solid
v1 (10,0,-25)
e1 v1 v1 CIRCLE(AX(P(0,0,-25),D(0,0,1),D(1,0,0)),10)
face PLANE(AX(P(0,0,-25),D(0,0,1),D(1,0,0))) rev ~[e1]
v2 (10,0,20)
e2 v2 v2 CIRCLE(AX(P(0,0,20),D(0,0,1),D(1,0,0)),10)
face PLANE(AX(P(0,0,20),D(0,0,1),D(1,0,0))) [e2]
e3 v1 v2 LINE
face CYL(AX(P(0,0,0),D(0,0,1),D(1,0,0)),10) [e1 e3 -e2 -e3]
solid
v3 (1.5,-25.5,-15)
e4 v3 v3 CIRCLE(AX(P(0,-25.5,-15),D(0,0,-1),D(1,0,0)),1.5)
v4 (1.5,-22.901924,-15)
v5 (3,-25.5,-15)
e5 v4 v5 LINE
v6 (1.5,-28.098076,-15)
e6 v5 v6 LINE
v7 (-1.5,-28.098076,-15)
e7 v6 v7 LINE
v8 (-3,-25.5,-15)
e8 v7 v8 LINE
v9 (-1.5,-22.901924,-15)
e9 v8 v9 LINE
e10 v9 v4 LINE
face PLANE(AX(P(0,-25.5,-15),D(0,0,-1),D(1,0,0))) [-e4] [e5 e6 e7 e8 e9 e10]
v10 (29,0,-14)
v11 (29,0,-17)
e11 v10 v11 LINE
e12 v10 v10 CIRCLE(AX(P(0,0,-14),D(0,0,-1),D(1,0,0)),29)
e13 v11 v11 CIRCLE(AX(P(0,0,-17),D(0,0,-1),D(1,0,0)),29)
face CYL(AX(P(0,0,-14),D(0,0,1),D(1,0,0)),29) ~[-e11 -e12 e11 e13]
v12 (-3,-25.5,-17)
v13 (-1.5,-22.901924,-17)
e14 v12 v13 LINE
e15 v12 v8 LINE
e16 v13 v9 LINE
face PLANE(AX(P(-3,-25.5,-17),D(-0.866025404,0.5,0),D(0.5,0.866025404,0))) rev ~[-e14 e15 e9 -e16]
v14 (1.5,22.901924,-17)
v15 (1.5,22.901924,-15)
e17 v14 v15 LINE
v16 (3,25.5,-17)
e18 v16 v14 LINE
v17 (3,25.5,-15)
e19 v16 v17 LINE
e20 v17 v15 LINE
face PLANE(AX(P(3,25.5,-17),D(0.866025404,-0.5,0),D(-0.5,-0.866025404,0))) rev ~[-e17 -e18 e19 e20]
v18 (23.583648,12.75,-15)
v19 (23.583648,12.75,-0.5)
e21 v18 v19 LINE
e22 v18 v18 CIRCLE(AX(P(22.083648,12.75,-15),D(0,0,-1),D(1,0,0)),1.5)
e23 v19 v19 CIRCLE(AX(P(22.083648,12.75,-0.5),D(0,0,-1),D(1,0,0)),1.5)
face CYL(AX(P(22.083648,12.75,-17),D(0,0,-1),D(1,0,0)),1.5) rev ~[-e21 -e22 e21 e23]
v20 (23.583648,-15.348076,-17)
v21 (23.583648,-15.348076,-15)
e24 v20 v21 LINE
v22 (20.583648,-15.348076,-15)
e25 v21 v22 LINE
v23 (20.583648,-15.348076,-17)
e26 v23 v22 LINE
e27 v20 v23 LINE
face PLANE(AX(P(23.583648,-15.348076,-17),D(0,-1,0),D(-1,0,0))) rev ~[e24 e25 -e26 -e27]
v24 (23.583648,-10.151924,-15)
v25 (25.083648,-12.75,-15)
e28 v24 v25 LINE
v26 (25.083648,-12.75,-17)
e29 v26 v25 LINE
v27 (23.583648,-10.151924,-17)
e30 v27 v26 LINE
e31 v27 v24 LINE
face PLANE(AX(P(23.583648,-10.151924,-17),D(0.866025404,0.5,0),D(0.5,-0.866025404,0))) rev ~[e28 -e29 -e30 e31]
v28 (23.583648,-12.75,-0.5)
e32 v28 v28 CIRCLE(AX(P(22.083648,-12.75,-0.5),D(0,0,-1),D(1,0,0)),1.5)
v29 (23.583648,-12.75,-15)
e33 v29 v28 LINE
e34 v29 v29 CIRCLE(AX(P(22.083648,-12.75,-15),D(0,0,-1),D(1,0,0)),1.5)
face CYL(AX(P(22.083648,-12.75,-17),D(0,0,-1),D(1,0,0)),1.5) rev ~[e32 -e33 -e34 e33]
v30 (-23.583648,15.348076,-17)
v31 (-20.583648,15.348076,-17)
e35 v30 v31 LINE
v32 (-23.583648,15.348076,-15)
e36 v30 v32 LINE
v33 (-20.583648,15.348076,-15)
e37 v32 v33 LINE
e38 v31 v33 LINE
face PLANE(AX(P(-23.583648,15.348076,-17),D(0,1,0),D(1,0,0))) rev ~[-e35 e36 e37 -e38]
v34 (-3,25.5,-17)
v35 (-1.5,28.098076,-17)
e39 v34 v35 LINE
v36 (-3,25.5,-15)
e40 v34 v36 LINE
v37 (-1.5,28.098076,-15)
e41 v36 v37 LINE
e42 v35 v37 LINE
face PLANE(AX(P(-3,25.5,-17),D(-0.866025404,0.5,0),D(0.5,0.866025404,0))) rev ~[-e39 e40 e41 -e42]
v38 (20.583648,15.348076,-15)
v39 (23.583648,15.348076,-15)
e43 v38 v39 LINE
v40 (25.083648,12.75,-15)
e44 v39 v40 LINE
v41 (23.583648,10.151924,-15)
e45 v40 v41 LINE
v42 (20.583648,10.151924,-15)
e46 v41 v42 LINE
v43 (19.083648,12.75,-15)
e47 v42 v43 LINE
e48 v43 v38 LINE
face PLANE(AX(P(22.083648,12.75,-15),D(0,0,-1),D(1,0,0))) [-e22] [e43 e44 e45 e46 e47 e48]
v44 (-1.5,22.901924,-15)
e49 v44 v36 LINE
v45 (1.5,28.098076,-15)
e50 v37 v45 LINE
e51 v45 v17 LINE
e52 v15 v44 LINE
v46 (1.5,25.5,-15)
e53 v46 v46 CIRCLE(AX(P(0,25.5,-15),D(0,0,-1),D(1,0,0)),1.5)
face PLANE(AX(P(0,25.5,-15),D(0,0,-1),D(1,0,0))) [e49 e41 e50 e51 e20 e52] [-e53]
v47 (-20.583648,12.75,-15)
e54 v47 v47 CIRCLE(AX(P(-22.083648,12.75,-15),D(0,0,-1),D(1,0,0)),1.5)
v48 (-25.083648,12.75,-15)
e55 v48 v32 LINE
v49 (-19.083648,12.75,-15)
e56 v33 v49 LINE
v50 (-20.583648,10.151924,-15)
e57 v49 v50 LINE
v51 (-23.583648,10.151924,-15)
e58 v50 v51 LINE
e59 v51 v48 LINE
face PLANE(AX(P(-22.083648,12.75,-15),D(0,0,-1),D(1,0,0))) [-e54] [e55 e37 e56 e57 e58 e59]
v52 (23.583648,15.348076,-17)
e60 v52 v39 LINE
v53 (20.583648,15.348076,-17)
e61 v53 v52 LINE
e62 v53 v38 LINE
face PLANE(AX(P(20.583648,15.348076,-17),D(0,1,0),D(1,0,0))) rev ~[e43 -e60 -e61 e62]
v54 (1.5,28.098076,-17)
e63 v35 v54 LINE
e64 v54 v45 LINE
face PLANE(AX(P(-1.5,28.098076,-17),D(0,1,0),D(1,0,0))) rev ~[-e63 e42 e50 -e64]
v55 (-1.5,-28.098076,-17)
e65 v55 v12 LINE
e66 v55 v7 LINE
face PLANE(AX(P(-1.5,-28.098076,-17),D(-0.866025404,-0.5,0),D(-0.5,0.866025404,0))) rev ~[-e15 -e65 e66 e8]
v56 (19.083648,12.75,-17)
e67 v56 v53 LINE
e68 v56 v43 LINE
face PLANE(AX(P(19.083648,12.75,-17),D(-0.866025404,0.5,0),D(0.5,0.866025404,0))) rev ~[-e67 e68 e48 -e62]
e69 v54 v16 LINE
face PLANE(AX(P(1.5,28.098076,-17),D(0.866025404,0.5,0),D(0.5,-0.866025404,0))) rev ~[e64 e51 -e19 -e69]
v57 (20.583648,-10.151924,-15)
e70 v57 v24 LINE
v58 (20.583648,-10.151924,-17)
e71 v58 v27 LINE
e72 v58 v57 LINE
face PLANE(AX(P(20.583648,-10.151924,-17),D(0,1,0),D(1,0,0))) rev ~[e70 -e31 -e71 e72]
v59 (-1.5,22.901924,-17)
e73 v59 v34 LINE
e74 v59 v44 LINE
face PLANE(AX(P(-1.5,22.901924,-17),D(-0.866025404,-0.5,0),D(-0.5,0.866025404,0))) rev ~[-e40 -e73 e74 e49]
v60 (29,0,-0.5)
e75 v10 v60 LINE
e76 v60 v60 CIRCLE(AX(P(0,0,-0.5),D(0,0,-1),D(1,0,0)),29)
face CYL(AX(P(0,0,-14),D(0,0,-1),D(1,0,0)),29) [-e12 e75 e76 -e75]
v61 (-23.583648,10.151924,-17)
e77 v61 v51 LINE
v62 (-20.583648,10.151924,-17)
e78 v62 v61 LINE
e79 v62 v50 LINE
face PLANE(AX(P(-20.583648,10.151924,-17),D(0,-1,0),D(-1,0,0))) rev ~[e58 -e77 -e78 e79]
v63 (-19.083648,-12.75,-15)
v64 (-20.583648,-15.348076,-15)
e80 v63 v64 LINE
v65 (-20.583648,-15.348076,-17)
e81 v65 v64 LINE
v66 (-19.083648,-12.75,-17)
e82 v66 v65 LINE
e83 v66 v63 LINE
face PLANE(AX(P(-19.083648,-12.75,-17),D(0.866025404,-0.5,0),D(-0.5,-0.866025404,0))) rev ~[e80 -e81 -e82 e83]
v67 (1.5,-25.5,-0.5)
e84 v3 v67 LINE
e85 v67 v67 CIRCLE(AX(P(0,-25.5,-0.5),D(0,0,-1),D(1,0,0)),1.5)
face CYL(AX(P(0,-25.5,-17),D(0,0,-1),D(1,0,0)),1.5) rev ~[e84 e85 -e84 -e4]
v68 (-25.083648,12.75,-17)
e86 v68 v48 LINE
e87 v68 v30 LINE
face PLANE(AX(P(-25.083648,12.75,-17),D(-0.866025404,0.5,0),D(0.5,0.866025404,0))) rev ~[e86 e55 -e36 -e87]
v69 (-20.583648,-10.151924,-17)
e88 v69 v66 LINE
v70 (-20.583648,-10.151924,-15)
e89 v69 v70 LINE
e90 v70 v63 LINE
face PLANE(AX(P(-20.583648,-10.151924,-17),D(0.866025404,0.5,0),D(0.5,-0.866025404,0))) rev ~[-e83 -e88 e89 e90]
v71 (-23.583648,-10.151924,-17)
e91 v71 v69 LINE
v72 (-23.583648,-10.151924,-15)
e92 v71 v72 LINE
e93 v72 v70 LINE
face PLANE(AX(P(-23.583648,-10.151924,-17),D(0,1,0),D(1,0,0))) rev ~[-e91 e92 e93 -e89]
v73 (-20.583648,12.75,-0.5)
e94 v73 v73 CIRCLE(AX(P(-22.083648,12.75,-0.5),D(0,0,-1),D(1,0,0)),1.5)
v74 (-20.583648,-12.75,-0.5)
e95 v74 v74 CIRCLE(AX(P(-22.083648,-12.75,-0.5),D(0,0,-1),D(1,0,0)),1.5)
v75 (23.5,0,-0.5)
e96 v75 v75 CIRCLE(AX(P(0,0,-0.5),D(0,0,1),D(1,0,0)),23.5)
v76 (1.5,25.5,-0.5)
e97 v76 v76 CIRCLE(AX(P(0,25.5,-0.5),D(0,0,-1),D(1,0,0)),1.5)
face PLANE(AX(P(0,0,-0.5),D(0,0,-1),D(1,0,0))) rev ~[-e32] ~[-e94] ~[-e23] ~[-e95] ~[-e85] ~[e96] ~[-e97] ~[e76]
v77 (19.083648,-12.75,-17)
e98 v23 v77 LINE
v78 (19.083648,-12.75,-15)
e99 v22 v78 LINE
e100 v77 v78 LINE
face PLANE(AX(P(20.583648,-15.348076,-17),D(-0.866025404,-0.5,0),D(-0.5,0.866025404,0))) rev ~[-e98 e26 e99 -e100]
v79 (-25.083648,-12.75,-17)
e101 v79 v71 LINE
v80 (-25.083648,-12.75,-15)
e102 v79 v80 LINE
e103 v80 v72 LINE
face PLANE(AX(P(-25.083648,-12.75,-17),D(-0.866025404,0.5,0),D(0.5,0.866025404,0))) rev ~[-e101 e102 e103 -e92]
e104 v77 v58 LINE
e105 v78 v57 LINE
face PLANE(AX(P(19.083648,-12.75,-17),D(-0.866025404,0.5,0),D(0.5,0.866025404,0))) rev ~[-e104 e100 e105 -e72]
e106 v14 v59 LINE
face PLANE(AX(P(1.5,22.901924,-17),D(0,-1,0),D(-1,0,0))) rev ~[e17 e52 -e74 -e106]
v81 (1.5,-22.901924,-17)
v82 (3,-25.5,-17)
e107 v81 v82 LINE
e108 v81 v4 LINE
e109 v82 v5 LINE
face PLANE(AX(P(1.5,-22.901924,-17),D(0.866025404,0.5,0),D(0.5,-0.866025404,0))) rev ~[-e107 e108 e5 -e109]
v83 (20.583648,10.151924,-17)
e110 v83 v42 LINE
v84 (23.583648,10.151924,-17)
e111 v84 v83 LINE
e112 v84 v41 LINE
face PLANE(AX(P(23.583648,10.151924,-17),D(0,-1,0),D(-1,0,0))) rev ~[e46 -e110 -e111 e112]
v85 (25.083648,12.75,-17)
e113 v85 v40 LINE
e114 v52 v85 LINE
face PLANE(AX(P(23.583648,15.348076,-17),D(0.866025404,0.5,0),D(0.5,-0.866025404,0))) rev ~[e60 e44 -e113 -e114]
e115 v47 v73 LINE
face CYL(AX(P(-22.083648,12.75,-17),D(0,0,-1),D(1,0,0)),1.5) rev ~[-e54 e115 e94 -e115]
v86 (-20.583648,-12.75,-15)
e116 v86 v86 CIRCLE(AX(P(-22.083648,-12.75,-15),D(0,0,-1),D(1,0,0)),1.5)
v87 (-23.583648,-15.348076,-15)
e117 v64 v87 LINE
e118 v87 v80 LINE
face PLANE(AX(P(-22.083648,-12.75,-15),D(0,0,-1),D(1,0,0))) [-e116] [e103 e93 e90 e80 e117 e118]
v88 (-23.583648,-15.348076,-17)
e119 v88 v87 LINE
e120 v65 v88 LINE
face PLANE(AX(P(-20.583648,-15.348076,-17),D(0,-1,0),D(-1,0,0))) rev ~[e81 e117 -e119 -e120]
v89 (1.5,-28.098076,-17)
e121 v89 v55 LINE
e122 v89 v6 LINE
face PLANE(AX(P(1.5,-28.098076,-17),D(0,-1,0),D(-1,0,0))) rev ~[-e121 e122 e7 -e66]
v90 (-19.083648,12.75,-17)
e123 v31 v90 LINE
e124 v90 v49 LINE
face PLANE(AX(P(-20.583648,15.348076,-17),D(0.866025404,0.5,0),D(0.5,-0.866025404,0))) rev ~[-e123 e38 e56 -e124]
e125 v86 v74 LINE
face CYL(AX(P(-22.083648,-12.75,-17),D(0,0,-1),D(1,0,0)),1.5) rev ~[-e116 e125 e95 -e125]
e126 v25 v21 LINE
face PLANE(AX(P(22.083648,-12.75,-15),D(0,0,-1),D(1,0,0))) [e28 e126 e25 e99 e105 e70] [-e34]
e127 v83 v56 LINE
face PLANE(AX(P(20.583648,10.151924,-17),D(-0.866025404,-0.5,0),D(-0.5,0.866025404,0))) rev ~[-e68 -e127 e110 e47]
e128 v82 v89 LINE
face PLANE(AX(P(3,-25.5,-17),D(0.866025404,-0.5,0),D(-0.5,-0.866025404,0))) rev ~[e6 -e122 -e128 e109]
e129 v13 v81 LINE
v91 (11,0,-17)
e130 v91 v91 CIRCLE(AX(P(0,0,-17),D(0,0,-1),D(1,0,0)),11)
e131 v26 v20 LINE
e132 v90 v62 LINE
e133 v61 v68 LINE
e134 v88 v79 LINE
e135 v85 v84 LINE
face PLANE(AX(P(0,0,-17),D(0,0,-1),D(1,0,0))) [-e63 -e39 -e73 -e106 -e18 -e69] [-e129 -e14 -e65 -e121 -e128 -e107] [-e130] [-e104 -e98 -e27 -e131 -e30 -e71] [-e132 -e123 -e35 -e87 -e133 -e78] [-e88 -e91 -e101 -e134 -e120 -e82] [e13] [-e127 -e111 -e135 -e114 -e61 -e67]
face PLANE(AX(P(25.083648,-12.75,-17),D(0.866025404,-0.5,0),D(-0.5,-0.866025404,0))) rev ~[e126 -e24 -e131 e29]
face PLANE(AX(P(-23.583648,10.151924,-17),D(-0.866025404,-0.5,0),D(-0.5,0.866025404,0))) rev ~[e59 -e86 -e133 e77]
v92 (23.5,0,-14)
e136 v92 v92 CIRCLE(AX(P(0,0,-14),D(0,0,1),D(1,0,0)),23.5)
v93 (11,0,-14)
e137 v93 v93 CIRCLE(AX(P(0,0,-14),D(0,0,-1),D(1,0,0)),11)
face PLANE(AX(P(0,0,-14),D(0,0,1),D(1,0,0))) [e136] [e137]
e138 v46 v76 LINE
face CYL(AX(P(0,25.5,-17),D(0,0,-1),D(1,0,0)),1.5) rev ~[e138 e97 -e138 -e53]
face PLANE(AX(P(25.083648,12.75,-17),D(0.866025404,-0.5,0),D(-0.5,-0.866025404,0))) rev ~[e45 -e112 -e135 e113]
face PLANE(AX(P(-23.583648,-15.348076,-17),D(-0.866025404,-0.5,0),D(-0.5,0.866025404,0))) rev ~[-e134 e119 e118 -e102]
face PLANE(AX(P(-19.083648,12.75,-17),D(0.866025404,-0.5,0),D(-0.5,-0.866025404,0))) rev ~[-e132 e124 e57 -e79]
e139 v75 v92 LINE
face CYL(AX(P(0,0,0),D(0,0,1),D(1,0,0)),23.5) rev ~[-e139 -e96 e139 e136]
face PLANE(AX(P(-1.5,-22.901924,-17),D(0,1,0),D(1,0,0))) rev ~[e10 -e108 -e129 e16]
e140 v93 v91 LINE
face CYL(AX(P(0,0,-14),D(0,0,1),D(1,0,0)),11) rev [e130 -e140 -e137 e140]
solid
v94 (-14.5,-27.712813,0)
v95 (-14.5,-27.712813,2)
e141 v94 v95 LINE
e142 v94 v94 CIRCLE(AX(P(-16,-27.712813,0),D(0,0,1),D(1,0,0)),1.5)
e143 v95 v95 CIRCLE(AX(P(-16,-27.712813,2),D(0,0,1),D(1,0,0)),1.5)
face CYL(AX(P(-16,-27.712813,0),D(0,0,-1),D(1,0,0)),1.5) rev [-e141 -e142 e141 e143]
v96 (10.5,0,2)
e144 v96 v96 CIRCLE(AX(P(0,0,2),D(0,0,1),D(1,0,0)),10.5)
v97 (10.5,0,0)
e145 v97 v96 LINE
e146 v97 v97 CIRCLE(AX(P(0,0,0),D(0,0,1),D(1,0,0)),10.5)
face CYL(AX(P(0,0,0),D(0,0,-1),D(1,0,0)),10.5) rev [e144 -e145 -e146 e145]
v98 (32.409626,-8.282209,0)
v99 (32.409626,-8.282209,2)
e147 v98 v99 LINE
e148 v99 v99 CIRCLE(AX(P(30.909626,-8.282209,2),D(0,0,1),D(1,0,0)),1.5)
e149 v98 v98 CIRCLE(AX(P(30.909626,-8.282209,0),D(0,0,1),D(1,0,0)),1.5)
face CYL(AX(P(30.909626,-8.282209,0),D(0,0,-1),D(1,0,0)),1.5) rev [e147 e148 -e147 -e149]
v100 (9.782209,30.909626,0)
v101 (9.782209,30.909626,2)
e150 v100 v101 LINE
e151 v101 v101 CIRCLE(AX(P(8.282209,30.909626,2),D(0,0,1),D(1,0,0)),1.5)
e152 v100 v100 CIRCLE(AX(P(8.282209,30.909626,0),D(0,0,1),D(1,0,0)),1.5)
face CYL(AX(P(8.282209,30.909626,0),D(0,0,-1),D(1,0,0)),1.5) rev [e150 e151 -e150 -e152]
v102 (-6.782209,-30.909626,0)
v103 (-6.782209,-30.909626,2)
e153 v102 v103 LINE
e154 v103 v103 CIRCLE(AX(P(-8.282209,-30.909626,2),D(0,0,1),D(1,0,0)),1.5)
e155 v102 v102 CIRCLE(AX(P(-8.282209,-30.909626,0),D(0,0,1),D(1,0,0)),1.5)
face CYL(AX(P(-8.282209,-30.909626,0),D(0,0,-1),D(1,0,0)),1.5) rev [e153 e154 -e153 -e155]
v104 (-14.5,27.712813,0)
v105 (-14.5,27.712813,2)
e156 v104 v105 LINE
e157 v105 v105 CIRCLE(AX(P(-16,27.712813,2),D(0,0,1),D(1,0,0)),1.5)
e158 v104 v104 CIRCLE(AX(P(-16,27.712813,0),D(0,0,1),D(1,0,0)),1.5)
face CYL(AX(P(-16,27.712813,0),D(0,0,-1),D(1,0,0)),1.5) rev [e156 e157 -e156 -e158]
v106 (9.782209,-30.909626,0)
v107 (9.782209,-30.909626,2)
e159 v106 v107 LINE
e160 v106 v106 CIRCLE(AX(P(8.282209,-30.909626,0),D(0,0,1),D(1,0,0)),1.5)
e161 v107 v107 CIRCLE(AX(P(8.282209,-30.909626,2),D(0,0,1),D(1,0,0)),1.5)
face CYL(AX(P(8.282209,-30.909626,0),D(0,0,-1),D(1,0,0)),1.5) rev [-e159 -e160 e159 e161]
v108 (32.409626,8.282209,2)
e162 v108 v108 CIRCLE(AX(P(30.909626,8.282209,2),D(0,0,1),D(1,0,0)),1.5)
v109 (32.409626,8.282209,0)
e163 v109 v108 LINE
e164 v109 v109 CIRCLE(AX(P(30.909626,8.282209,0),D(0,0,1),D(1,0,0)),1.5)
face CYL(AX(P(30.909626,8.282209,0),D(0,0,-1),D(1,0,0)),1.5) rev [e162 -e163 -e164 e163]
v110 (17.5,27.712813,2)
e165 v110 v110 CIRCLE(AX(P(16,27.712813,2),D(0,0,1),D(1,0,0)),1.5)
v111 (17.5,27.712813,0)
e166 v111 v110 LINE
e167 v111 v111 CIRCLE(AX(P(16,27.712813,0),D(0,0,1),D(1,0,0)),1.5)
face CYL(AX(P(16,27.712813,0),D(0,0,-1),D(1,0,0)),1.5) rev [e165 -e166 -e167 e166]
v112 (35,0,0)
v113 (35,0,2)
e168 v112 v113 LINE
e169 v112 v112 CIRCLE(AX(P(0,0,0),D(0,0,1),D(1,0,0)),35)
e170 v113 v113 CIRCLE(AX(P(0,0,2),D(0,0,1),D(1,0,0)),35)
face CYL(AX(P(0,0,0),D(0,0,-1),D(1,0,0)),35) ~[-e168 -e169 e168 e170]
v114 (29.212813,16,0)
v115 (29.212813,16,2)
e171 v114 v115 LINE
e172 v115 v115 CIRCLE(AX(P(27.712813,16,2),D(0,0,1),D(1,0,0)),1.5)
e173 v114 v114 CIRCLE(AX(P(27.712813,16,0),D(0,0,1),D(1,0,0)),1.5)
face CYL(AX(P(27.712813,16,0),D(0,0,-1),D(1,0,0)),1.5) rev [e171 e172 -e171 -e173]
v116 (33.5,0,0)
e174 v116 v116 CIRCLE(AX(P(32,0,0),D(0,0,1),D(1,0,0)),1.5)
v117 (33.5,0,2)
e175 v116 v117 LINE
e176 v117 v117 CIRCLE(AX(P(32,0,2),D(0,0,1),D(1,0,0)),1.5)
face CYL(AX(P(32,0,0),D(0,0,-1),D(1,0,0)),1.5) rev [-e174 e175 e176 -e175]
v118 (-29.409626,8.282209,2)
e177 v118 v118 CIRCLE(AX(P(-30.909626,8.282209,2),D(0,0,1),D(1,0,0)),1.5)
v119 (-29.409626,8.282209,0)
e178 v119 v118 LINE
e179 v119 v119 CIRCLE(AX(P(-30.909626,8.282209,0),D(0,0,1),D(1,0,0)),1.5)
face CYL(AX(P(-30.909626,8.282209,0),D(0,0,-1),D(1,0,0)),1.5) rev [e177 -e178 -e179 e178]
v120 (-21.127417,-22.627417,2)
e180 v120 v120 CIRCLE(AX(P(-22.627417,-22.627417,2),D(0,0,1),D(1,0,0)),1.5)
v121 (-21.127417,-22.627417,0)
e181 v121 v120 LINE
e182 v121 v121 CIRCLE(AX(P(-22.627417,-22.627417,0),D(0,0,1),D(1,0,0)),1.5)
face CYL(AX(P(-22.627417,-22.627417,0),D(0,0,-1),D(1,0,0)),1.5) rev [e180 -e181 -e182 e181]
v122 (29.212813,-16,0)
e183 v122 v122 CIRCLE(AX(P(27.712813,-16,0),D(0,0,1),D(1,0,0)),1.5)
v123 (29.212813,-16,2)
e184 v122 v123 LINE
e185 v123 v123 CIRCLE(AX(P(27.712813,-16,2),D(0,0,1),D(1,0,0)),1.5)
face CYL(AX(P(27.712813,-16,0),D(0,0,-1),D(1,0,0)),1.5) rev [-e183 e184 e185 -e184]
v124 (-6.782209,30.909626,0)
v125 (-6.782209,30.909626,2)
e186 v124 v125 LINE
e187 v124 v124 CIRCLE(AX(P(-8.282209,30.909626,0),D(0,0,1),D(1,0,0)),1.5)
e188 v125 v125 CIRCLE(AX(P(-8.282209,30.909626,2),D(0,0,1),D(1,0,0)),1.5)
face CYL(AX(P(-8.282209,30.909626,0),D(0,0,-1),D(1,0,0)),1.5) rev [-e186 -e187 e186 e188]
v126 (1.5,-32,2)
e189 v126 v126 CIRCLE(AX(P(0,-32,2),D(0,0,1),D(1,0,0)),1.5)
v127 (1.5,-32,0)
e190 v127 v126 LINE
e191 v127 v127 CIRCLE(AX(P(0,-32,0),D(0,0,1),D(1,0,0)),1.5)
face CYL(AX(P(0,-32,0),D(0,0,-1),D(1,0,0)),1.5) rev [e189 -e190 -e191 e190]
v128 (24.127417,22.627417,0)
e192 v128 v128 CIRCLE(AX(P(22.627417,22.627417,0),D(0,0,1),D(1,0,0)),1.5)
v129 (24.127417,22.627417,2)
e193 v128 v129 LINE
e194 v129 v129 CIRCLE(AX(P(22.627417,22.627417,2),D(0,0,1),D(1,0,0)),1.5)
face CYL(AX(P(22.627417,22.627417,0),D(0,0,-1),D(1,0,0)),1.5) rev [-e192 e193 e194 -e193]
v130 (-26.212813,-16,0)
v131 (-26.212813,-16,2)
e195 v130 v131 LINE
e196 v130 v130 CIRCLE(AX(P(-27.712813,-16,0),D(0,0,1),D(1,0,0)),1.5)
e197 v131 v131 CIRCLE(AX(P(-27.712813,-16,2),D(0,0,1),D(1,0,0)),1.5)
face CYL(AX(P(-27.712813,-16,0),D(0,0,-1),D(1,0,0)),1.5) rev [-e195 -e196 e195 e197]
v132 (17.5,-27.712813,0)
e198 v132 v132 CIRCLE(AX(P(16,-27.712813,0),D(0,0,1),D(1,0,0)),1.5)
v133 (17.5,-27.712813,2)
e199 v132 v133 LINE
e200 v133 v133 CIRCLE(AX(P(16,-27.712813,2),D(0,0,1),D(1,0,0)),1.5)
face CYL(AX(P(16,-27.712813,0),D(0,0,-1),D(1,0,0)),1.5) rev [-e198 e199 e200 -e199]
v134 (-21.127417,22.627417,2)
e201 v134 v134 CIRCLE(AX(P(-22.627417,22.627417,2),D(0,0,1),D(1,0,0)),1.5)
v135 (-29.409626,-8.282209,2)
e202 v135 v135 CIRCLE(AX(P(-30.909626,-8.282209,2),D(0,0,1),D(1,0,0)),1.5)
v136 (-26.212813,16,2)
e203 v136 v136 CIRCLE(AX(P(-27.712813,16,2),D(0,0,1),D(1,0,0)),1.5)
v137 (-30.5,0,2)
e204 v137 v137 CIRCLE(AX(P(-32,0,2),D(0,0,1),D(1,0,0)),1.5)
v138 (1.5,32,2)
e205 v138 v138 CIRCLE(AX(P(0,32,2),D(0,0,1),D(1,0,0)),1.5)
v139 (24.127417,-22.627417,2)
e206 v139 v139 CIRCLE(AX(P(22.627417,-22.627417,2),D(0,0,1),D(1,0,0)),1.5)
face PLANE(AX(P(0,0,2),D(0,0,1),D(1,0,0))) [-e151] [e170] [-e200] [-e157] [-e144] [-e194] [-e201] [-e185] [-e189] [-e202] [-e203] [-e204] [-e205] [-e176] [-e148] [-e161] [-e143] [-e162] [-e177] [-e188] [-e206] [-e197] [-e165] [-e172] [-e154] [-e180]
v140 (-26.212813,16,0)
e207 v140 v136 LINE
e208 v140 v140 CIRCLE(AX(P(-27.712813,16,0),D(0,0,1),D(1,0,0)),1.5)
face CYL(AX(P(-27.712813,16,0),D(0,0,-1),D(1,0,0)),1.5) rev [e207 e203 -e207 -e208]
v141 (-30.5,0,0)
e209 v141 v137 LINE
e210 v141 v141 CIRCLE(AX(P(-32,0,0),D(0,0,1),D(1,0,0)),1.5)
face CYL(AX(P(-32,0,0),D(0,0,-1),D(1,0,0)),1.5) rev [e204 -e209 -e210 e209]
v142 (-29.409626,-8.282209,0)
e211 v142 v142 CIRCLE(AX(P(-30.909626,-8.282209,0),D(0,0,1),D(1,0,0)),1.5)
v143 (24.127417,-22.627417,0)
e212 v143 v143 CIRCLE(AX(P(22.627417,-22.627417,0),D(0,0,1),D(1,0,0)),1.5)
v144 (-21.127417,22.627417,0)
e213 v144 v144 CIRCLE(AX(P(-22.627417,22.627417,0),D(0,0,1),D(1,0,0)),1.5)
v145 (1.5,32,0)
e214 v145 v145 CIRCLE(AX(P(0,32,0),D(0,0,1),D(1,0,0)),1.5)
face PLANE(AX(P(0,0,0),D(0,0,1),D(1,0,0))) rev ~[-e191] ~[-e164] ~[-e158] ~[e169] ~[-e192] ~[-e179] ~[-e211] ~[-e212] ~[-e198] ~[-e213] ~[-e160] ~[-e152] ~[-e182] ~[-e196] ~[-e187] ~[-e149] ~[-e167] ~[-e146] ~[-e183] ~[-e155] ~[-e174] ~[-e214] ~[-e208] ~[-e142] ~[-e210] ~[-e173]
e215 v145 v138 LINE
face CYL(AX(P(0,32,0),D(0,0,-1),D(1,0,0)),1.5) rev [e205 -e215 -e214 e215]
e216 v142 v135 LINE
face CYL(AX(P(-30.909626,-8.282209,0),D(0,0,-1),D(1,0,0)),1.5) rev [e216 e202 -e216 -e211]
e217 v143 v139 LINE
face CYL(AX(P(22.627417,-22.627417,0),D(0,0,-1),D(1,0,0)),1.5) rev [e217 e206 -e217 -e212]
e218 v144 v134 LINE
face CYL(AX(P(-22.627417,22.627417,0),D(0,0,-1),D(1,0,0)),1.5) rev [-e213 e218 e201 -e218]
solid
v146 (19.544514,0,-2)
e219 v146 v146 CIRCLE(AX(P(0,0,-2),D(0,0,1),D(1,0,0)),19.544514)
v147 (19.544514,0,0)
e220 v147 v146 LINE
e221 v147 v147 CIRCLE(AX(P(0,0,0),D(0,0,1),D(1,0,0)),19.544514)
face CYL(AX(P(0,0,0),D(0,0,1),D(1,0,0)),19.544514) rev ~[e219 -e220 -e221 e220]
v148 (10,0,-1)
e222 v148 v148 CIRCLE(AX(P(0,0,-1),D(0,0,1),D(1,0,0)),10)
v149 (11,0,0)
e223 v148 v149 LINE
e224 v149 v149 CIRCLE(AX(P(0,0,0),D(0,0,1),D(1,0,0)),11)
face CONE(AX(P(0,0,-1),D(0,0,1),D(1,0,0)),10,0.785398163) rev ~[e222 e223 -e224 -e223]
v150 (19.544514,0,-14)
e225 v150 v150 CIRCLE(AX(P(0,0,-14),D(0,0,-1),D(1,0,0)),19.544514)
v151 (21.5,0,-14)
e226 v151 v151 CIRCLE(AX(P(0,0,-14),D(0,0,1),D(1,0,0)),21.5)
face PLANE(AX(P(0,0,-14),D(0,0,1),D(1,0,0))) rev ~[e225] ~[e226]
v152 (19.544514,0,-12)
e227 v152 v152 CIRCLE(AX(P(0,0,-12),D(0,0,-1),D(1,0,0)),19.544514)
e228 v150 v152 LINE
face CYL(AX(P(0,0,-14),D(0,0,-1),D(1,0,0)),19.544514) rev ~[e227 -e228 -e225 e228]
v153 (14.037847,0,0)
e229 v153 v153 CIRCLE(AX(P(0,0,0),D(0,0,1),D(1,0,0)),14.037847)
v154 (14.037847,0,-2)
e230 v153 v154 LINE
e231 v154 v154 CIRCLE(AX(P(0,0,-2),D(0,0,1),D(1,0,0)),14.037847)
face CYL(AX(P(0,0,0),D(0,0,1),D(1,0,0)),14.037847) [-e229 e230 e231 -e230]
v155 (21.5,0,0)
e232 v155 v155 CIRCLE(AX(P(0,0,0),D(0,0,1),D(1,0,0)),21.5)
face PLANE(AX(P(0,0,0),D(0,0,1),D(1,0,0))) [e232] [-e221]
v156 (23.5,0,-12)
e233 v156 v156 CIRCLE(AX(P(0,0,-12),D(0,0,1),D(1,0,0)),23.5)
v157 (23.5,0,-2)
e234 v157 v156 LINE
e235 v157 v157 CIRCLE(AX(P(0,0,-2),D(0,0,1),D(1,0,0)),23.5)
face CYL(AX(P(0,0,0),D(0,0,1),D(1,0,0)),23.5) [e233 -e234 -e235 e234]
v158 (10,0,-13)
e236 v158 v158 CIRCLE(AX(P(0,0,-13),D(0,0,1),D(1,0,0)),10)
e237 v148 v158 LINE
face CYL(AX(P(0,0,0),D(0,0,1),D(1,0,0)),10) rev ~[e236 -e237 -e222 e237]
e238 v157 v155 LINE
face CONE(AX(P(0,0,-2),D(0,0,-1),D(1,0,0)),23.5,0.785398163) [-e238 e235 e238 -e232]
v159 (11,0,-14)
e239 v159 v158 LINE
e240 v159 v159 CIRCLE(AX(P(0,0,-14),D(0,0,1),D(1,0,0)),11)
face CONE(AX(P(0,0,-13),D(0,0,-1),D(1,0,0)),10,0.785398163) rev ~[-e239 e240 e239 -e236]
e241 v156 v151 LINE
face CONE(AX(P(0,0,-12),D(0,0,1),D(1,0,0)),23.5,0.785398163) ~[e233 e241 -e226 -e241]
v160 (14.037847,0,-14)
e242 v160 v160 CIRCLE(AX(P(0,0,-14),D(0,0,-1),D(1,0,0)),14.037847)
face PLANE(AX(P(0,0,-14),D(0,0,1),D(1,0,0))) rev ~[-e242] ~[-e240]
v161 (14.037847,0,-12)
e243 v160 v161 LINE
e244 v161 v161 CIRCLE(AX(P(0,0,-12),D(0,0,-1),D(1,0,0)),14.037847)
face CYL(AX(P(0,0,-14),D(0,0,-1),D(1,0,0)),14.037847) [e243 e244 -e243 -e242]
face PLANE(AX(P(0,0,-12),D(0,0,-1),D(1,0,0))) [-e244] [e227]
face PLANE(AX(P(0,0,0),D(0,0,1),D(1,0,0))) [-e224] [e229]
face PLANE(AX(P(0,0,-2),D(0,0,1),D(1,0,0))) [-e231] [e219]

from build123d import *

# Parameters (mm, degrees)
F0_R           = 23.5
F0_R_2         = 19.5445144725
F0_R_3         = 14.0378467766
F0_R_4         = 10
F1_DEPTH       = 14
F2_DEPTH       = 2
F3_SIZE        = 2
F4_SIZE        = 1
F5_R           = 19.5445144725
F5_R_2         = 14.0378467766
F6_DEPTH       = 2
F7_R           = 35
F7_R_2         = 1.5
F7_R_3         = 10.5
F8_DEPTH       = 2
F9_R           = 29
F9_R_2         = 14.0378467766
F9_R_3         = 11
F10_DEPTH      = 13.5
F10_DEPTH_BACK = 3
F11_DEPTH      = 14
F12_DEPTH      = 20
F12_DEPTH_BACK = 25
F13_R          = 1.5
F14_DEPTH      = 37.001
F15_R          = 1.5
F16_DEPTH      = 2


with BuildPart() as f1:
    # F0 (on Top) → F1 (new body)
    with BuildSketch(Plane.XY):
        Circle(F0_R)
        Circle(F0_R_2, mode=Mode.SUBTRACT)
        Circle(F0_R_2)
        Circle(F0_R_3, mode=Mode.SUBTRACT)
        Circle(F0_R_3)
        Circle(F0_R_4, mode=Mode.SUBTRACT)
    extrude(amount=-F1_DEPTH)

    # F0 (on Top) → F2 (cut)
    with BuildSketch(Plane.XY):
        Circle(F0_R_2)
        Circle(F0_R_3, mode=Mode.SUBTRACT)
    extrude(amount=-F2_DEPTH, mode=Mode.SUBTRACT)

    # F3
    f3_edges = [f1.edges().sort_by_distance(p)[0] for p in [
        (-23.5, 0, 0),
        (-23.5, 0, -14),
    ]]
    chamfer(f3_edges, length=F3_SIZE)

    # F4
    f4_edges = [f1.edges().sort_by_distance(p)[0] for p in [
        (-10, 0, -14),
        (-10, 0, 0),
    ]]
    chamfer(f4_edges, length=F4_SIZE)

    # F5 (on face) → F6 (cut)
    with BuildSketch(Plane(origin=(0, 0, -14), x_dir=(1, 0, 0), z_dir=(0, 0, -1))):
        Circle(F5_R)
        Circle(F5_R_2, mode=Mode.SUBTRACT)
    extrude(amount=-F6_DEPTH, mode=Mode.SUBTRACT)


with BuildPart() as f8:
    # F7 (on Top) → F8 (new body)
    with BuildSketch(Plane.XY):
        Circle(F7_R)
        with Locations((-22.627416998, -22.627416998)):
            Circle(F7_R_2, mode=Mode.SUBTRACT)
        with Locations((-16, -27.7128129211)):
            Circle(F7_R_2, mode=Mode.SUBTRACT)
        with Locations((-8.2822094433, -30.9096264413)):
            Circle(F7_R_2, mode=Mode.SUBTRACT)
        with Locations((-27.7128129211, -16)):
            Circle(F7_R_2, mode=Mode.SUBTRACT)
        with Locations((-30.9096264413, -8.2822094433)):
            Circle(F7_R_2, mode=Mode.SUBTRACT)
        with Locations((0, -32)):
            Circle(F7_R_2, mode=Mode.SUBTRACT)
        with Locations((8.2822094433, -30.9096264413)):
            Circle(F7_R_2, mode=Mode.SUBTRACT)
        with Locations((16, -27.7128129211)):
            Circle(F7_R_2, mode=Mode.SUBTRACT)
        with Locations((22.627416998, -22.627416998)):
            Circle(F7_R_2, mode=Mode.SUBTRACT)
        with Locations((27.7128129211, -16)):
            Circle(F7_R_2, mode=Mode.SUBTRACT)
        with Locations((30.9096264413, -8.2822094433)):
            Circle(F7_R_2, mode=Mode.SUBTRACT)
        with Locations((-32, 0)):
            Circle(F7_R_2, mode=Mode.SUBTRACT)
        with Locations((-30.9096264413, 8.2822094433)):
            Circle(F7_R_2, mode=Mode.SUBTRACT)
        with Locations((-27.7128129211, 16)):
            Circle(F7_R_2, mode=Mode.SUBTRACT)
        with Locations((-22.627416998, 22.627416998)):
            Circle(F7_R_2, mode=Mode.SUBTRACT)
        with Locations((-16, 27.7128129211)):
            Circle(F7_R_2, mode=Mode.SUBTRACT)
        with Locations((-8.2822094433, 30.9096264413)):
            Circle(F7_R_2, mode=Mode.SUBTRACT)
        Circle(F7_R_3, mode=Mode.SUBTRACT)
        with Locations((32, 0)):
            Circle(F7_R_2, mode=Mode.SUBTRACT)
        with Locations((30.9096264413, 8.2822094433)):
            Circle(F7_R_2, mode=Mode.SUBTRACT)
        with Locations((27.7128129211, 16)):
            Circle(F7_R_2, mode=Mode.SUBTRACT)
        with Locations((0, 32)):
            Circle(F7_R_2, mode=Mode.SUBTRACT)
        with Locations((8.2822094433, 30.9096264413)):
            Circle(F7_R_2, mode=Mode.SUBTRACT)
        with Locations((16, 27.7128129211)):
            Circle(F7_R_2, mode=Mode.SUBTRACT)
        with Locations((22.627416998, 22.627416998)):
            Circle(F7_R_2, mode=Mode.SUBTRACT)
    extrude(amount=F8_DEPTH)


with BuildPart() as f10:
    # F9 (on face) → F10 (new body, two sides)
    with BuildSketch(Plane(origin=(0, 0, -14), x_dir=(1, 0, 0), z_dir=(0, 0, -1))) as f10_sk:
        Circle(F9_R)
        Circle(F9_R_2, mode=Mode.SUBTRACT)
        Circle(F9_R_2)
        Circle(F9_R_3, mode=Mode.SUBTRACT)
    extrude(amount=-F10_DEPTH)
    extrude(f10_sk.sketch, amount=F10_DEPTH_BACK)

    # F0 (on Top) → F11 (cut, through all)
    with BuildSketch(Plane.XY):
        Circle(F0_R)
        Circle(F0_R_2, mode=Mode.SUBTRACT)
        Circle(F0_R_2)
        Circle(F0_R_3, mode=Mode.SUBTRACT)
        Circle(F0_R_3)
        Circle(F0_R_4, mode=Mode.SUBTRACT)
    extrude(amount=-F11_DEPTH, mode=Mode.SUBTRACT)

    # F13 (on face) → F14 (cut, through all)
    with BuildSketch(Plane(origin=(0, 0, -17), x_dir=(1, 0, 0), z_dir=(0, 0, -1))):
        with Locations((0, 25.5)):
            Circle(F13_R)
        with Locations((-22.0836477965, 12.75)):
            Circle(F13_R)
        with Locations((-22.0836477965, -12.75)):
            Circle(F13_R)
        with Locations((0, -25.5)):
            Circle(F13_R)
        with Locations((22.0836477965, 12.75)):
            Circle(F13_R)
        with Locations((22.0836477965, -12.75)):
            Circle(F13_R)
    extrude(amount=-F14_DEPTH, mode=Mode.SUBTRACT)

    # F15 (on face) → F16 (cut)
    with BuildSketch(Plane(origin=(0, 0, -17), x_dir=(1, 0, 0), z_dir=(0, 0, -1))):
        Polygon((-1.5, 22.9019237886), (1.5, 22.9019237886), (3, 25.5), (1.5, 28.0980762114), (-1.5, 28.0980762114), (-3, 25.5), align=None)
        with Locations((0, 25.5)):
            Circle(F15_R, mode=Mode.SUBTRACT)
        Polygon((-25.0836477965, 12.75), (-23.5836477965, 10.1519237886), (-20.5836477965, 10.1519237886), (-19.0836477965, 12.75), (-20.5836477965, 15.3480762114), (-23.5836477965, 15.3480762114), align=None)
        with Locations((-22.0836477965, 12.75)):
            Circle(F15_R, mode=Mode.SUBTRACT)
        Polygon((-23.5836477965, -15.3480762114), (-20.5836477965, -15.3480762114), (-19.0836477965, -12.75), (-20.5836477965, -10.1519237886), (-23.5836477965, -10.1519237886), (-25.0836477965, -12.75), align=None)
        with Locations((-22.0836477965, -12.75)):
            Circle(F15_R, mode=Mode.SUBTRACT)
        Polygon((23.5836477965, 15.3480762114), (20.5836477965, 15.3480762114), (19.0836477965, 12.75), (20.5836477965, 10.1519237886), (23.5836477965, 10.1519237886), (25.0836477965, 12.75), align=None)
        with Locations((22.0836477965, 12.75)):
            Circle(F15_R, mode=Mode.SUBTRACT)
        Polygon((25.0836477965, -12.75), (23.5836477965, -10.1519237886), (20.5836477965, -10.1519237886), (19.0836477965, -12.75), (20.5836477965, -15.3480762114), (23.5836477965, -15.3480762114), align=None)
        with Locations((22.0836477965, -12.75)):
            Circle(F15_R, mode=Mode.SUBTRACT)
        Polygon((1.5, -28.0980762114), (3, -25.5), (1.5, -22.9019237886), (-1.5, -22.9019237886), (-3, -25.5), (-1.5, -28.0980762114), align=None)
        with Locations((0, -25.5)):
            Circle(F15_R, mode=Mode.SUBTRACT)
    extrude(amount=-F16_DEPTH, mode=Mode.SUBTRACT)


with BuildPart() as f12:
    # F0 (on Top) → F12 (new body, two sides)
    with BuildSketch(Plane.XY) as f12_sk:
        Circle(F0_R_4)
    extrude(amount=F12_DEPTH)
    extrude(f12_sk.sketch, amount=-F12_DEPTH_BACK)


solid = Compound([f1.part, f8.part, f10.part, f12.part])
